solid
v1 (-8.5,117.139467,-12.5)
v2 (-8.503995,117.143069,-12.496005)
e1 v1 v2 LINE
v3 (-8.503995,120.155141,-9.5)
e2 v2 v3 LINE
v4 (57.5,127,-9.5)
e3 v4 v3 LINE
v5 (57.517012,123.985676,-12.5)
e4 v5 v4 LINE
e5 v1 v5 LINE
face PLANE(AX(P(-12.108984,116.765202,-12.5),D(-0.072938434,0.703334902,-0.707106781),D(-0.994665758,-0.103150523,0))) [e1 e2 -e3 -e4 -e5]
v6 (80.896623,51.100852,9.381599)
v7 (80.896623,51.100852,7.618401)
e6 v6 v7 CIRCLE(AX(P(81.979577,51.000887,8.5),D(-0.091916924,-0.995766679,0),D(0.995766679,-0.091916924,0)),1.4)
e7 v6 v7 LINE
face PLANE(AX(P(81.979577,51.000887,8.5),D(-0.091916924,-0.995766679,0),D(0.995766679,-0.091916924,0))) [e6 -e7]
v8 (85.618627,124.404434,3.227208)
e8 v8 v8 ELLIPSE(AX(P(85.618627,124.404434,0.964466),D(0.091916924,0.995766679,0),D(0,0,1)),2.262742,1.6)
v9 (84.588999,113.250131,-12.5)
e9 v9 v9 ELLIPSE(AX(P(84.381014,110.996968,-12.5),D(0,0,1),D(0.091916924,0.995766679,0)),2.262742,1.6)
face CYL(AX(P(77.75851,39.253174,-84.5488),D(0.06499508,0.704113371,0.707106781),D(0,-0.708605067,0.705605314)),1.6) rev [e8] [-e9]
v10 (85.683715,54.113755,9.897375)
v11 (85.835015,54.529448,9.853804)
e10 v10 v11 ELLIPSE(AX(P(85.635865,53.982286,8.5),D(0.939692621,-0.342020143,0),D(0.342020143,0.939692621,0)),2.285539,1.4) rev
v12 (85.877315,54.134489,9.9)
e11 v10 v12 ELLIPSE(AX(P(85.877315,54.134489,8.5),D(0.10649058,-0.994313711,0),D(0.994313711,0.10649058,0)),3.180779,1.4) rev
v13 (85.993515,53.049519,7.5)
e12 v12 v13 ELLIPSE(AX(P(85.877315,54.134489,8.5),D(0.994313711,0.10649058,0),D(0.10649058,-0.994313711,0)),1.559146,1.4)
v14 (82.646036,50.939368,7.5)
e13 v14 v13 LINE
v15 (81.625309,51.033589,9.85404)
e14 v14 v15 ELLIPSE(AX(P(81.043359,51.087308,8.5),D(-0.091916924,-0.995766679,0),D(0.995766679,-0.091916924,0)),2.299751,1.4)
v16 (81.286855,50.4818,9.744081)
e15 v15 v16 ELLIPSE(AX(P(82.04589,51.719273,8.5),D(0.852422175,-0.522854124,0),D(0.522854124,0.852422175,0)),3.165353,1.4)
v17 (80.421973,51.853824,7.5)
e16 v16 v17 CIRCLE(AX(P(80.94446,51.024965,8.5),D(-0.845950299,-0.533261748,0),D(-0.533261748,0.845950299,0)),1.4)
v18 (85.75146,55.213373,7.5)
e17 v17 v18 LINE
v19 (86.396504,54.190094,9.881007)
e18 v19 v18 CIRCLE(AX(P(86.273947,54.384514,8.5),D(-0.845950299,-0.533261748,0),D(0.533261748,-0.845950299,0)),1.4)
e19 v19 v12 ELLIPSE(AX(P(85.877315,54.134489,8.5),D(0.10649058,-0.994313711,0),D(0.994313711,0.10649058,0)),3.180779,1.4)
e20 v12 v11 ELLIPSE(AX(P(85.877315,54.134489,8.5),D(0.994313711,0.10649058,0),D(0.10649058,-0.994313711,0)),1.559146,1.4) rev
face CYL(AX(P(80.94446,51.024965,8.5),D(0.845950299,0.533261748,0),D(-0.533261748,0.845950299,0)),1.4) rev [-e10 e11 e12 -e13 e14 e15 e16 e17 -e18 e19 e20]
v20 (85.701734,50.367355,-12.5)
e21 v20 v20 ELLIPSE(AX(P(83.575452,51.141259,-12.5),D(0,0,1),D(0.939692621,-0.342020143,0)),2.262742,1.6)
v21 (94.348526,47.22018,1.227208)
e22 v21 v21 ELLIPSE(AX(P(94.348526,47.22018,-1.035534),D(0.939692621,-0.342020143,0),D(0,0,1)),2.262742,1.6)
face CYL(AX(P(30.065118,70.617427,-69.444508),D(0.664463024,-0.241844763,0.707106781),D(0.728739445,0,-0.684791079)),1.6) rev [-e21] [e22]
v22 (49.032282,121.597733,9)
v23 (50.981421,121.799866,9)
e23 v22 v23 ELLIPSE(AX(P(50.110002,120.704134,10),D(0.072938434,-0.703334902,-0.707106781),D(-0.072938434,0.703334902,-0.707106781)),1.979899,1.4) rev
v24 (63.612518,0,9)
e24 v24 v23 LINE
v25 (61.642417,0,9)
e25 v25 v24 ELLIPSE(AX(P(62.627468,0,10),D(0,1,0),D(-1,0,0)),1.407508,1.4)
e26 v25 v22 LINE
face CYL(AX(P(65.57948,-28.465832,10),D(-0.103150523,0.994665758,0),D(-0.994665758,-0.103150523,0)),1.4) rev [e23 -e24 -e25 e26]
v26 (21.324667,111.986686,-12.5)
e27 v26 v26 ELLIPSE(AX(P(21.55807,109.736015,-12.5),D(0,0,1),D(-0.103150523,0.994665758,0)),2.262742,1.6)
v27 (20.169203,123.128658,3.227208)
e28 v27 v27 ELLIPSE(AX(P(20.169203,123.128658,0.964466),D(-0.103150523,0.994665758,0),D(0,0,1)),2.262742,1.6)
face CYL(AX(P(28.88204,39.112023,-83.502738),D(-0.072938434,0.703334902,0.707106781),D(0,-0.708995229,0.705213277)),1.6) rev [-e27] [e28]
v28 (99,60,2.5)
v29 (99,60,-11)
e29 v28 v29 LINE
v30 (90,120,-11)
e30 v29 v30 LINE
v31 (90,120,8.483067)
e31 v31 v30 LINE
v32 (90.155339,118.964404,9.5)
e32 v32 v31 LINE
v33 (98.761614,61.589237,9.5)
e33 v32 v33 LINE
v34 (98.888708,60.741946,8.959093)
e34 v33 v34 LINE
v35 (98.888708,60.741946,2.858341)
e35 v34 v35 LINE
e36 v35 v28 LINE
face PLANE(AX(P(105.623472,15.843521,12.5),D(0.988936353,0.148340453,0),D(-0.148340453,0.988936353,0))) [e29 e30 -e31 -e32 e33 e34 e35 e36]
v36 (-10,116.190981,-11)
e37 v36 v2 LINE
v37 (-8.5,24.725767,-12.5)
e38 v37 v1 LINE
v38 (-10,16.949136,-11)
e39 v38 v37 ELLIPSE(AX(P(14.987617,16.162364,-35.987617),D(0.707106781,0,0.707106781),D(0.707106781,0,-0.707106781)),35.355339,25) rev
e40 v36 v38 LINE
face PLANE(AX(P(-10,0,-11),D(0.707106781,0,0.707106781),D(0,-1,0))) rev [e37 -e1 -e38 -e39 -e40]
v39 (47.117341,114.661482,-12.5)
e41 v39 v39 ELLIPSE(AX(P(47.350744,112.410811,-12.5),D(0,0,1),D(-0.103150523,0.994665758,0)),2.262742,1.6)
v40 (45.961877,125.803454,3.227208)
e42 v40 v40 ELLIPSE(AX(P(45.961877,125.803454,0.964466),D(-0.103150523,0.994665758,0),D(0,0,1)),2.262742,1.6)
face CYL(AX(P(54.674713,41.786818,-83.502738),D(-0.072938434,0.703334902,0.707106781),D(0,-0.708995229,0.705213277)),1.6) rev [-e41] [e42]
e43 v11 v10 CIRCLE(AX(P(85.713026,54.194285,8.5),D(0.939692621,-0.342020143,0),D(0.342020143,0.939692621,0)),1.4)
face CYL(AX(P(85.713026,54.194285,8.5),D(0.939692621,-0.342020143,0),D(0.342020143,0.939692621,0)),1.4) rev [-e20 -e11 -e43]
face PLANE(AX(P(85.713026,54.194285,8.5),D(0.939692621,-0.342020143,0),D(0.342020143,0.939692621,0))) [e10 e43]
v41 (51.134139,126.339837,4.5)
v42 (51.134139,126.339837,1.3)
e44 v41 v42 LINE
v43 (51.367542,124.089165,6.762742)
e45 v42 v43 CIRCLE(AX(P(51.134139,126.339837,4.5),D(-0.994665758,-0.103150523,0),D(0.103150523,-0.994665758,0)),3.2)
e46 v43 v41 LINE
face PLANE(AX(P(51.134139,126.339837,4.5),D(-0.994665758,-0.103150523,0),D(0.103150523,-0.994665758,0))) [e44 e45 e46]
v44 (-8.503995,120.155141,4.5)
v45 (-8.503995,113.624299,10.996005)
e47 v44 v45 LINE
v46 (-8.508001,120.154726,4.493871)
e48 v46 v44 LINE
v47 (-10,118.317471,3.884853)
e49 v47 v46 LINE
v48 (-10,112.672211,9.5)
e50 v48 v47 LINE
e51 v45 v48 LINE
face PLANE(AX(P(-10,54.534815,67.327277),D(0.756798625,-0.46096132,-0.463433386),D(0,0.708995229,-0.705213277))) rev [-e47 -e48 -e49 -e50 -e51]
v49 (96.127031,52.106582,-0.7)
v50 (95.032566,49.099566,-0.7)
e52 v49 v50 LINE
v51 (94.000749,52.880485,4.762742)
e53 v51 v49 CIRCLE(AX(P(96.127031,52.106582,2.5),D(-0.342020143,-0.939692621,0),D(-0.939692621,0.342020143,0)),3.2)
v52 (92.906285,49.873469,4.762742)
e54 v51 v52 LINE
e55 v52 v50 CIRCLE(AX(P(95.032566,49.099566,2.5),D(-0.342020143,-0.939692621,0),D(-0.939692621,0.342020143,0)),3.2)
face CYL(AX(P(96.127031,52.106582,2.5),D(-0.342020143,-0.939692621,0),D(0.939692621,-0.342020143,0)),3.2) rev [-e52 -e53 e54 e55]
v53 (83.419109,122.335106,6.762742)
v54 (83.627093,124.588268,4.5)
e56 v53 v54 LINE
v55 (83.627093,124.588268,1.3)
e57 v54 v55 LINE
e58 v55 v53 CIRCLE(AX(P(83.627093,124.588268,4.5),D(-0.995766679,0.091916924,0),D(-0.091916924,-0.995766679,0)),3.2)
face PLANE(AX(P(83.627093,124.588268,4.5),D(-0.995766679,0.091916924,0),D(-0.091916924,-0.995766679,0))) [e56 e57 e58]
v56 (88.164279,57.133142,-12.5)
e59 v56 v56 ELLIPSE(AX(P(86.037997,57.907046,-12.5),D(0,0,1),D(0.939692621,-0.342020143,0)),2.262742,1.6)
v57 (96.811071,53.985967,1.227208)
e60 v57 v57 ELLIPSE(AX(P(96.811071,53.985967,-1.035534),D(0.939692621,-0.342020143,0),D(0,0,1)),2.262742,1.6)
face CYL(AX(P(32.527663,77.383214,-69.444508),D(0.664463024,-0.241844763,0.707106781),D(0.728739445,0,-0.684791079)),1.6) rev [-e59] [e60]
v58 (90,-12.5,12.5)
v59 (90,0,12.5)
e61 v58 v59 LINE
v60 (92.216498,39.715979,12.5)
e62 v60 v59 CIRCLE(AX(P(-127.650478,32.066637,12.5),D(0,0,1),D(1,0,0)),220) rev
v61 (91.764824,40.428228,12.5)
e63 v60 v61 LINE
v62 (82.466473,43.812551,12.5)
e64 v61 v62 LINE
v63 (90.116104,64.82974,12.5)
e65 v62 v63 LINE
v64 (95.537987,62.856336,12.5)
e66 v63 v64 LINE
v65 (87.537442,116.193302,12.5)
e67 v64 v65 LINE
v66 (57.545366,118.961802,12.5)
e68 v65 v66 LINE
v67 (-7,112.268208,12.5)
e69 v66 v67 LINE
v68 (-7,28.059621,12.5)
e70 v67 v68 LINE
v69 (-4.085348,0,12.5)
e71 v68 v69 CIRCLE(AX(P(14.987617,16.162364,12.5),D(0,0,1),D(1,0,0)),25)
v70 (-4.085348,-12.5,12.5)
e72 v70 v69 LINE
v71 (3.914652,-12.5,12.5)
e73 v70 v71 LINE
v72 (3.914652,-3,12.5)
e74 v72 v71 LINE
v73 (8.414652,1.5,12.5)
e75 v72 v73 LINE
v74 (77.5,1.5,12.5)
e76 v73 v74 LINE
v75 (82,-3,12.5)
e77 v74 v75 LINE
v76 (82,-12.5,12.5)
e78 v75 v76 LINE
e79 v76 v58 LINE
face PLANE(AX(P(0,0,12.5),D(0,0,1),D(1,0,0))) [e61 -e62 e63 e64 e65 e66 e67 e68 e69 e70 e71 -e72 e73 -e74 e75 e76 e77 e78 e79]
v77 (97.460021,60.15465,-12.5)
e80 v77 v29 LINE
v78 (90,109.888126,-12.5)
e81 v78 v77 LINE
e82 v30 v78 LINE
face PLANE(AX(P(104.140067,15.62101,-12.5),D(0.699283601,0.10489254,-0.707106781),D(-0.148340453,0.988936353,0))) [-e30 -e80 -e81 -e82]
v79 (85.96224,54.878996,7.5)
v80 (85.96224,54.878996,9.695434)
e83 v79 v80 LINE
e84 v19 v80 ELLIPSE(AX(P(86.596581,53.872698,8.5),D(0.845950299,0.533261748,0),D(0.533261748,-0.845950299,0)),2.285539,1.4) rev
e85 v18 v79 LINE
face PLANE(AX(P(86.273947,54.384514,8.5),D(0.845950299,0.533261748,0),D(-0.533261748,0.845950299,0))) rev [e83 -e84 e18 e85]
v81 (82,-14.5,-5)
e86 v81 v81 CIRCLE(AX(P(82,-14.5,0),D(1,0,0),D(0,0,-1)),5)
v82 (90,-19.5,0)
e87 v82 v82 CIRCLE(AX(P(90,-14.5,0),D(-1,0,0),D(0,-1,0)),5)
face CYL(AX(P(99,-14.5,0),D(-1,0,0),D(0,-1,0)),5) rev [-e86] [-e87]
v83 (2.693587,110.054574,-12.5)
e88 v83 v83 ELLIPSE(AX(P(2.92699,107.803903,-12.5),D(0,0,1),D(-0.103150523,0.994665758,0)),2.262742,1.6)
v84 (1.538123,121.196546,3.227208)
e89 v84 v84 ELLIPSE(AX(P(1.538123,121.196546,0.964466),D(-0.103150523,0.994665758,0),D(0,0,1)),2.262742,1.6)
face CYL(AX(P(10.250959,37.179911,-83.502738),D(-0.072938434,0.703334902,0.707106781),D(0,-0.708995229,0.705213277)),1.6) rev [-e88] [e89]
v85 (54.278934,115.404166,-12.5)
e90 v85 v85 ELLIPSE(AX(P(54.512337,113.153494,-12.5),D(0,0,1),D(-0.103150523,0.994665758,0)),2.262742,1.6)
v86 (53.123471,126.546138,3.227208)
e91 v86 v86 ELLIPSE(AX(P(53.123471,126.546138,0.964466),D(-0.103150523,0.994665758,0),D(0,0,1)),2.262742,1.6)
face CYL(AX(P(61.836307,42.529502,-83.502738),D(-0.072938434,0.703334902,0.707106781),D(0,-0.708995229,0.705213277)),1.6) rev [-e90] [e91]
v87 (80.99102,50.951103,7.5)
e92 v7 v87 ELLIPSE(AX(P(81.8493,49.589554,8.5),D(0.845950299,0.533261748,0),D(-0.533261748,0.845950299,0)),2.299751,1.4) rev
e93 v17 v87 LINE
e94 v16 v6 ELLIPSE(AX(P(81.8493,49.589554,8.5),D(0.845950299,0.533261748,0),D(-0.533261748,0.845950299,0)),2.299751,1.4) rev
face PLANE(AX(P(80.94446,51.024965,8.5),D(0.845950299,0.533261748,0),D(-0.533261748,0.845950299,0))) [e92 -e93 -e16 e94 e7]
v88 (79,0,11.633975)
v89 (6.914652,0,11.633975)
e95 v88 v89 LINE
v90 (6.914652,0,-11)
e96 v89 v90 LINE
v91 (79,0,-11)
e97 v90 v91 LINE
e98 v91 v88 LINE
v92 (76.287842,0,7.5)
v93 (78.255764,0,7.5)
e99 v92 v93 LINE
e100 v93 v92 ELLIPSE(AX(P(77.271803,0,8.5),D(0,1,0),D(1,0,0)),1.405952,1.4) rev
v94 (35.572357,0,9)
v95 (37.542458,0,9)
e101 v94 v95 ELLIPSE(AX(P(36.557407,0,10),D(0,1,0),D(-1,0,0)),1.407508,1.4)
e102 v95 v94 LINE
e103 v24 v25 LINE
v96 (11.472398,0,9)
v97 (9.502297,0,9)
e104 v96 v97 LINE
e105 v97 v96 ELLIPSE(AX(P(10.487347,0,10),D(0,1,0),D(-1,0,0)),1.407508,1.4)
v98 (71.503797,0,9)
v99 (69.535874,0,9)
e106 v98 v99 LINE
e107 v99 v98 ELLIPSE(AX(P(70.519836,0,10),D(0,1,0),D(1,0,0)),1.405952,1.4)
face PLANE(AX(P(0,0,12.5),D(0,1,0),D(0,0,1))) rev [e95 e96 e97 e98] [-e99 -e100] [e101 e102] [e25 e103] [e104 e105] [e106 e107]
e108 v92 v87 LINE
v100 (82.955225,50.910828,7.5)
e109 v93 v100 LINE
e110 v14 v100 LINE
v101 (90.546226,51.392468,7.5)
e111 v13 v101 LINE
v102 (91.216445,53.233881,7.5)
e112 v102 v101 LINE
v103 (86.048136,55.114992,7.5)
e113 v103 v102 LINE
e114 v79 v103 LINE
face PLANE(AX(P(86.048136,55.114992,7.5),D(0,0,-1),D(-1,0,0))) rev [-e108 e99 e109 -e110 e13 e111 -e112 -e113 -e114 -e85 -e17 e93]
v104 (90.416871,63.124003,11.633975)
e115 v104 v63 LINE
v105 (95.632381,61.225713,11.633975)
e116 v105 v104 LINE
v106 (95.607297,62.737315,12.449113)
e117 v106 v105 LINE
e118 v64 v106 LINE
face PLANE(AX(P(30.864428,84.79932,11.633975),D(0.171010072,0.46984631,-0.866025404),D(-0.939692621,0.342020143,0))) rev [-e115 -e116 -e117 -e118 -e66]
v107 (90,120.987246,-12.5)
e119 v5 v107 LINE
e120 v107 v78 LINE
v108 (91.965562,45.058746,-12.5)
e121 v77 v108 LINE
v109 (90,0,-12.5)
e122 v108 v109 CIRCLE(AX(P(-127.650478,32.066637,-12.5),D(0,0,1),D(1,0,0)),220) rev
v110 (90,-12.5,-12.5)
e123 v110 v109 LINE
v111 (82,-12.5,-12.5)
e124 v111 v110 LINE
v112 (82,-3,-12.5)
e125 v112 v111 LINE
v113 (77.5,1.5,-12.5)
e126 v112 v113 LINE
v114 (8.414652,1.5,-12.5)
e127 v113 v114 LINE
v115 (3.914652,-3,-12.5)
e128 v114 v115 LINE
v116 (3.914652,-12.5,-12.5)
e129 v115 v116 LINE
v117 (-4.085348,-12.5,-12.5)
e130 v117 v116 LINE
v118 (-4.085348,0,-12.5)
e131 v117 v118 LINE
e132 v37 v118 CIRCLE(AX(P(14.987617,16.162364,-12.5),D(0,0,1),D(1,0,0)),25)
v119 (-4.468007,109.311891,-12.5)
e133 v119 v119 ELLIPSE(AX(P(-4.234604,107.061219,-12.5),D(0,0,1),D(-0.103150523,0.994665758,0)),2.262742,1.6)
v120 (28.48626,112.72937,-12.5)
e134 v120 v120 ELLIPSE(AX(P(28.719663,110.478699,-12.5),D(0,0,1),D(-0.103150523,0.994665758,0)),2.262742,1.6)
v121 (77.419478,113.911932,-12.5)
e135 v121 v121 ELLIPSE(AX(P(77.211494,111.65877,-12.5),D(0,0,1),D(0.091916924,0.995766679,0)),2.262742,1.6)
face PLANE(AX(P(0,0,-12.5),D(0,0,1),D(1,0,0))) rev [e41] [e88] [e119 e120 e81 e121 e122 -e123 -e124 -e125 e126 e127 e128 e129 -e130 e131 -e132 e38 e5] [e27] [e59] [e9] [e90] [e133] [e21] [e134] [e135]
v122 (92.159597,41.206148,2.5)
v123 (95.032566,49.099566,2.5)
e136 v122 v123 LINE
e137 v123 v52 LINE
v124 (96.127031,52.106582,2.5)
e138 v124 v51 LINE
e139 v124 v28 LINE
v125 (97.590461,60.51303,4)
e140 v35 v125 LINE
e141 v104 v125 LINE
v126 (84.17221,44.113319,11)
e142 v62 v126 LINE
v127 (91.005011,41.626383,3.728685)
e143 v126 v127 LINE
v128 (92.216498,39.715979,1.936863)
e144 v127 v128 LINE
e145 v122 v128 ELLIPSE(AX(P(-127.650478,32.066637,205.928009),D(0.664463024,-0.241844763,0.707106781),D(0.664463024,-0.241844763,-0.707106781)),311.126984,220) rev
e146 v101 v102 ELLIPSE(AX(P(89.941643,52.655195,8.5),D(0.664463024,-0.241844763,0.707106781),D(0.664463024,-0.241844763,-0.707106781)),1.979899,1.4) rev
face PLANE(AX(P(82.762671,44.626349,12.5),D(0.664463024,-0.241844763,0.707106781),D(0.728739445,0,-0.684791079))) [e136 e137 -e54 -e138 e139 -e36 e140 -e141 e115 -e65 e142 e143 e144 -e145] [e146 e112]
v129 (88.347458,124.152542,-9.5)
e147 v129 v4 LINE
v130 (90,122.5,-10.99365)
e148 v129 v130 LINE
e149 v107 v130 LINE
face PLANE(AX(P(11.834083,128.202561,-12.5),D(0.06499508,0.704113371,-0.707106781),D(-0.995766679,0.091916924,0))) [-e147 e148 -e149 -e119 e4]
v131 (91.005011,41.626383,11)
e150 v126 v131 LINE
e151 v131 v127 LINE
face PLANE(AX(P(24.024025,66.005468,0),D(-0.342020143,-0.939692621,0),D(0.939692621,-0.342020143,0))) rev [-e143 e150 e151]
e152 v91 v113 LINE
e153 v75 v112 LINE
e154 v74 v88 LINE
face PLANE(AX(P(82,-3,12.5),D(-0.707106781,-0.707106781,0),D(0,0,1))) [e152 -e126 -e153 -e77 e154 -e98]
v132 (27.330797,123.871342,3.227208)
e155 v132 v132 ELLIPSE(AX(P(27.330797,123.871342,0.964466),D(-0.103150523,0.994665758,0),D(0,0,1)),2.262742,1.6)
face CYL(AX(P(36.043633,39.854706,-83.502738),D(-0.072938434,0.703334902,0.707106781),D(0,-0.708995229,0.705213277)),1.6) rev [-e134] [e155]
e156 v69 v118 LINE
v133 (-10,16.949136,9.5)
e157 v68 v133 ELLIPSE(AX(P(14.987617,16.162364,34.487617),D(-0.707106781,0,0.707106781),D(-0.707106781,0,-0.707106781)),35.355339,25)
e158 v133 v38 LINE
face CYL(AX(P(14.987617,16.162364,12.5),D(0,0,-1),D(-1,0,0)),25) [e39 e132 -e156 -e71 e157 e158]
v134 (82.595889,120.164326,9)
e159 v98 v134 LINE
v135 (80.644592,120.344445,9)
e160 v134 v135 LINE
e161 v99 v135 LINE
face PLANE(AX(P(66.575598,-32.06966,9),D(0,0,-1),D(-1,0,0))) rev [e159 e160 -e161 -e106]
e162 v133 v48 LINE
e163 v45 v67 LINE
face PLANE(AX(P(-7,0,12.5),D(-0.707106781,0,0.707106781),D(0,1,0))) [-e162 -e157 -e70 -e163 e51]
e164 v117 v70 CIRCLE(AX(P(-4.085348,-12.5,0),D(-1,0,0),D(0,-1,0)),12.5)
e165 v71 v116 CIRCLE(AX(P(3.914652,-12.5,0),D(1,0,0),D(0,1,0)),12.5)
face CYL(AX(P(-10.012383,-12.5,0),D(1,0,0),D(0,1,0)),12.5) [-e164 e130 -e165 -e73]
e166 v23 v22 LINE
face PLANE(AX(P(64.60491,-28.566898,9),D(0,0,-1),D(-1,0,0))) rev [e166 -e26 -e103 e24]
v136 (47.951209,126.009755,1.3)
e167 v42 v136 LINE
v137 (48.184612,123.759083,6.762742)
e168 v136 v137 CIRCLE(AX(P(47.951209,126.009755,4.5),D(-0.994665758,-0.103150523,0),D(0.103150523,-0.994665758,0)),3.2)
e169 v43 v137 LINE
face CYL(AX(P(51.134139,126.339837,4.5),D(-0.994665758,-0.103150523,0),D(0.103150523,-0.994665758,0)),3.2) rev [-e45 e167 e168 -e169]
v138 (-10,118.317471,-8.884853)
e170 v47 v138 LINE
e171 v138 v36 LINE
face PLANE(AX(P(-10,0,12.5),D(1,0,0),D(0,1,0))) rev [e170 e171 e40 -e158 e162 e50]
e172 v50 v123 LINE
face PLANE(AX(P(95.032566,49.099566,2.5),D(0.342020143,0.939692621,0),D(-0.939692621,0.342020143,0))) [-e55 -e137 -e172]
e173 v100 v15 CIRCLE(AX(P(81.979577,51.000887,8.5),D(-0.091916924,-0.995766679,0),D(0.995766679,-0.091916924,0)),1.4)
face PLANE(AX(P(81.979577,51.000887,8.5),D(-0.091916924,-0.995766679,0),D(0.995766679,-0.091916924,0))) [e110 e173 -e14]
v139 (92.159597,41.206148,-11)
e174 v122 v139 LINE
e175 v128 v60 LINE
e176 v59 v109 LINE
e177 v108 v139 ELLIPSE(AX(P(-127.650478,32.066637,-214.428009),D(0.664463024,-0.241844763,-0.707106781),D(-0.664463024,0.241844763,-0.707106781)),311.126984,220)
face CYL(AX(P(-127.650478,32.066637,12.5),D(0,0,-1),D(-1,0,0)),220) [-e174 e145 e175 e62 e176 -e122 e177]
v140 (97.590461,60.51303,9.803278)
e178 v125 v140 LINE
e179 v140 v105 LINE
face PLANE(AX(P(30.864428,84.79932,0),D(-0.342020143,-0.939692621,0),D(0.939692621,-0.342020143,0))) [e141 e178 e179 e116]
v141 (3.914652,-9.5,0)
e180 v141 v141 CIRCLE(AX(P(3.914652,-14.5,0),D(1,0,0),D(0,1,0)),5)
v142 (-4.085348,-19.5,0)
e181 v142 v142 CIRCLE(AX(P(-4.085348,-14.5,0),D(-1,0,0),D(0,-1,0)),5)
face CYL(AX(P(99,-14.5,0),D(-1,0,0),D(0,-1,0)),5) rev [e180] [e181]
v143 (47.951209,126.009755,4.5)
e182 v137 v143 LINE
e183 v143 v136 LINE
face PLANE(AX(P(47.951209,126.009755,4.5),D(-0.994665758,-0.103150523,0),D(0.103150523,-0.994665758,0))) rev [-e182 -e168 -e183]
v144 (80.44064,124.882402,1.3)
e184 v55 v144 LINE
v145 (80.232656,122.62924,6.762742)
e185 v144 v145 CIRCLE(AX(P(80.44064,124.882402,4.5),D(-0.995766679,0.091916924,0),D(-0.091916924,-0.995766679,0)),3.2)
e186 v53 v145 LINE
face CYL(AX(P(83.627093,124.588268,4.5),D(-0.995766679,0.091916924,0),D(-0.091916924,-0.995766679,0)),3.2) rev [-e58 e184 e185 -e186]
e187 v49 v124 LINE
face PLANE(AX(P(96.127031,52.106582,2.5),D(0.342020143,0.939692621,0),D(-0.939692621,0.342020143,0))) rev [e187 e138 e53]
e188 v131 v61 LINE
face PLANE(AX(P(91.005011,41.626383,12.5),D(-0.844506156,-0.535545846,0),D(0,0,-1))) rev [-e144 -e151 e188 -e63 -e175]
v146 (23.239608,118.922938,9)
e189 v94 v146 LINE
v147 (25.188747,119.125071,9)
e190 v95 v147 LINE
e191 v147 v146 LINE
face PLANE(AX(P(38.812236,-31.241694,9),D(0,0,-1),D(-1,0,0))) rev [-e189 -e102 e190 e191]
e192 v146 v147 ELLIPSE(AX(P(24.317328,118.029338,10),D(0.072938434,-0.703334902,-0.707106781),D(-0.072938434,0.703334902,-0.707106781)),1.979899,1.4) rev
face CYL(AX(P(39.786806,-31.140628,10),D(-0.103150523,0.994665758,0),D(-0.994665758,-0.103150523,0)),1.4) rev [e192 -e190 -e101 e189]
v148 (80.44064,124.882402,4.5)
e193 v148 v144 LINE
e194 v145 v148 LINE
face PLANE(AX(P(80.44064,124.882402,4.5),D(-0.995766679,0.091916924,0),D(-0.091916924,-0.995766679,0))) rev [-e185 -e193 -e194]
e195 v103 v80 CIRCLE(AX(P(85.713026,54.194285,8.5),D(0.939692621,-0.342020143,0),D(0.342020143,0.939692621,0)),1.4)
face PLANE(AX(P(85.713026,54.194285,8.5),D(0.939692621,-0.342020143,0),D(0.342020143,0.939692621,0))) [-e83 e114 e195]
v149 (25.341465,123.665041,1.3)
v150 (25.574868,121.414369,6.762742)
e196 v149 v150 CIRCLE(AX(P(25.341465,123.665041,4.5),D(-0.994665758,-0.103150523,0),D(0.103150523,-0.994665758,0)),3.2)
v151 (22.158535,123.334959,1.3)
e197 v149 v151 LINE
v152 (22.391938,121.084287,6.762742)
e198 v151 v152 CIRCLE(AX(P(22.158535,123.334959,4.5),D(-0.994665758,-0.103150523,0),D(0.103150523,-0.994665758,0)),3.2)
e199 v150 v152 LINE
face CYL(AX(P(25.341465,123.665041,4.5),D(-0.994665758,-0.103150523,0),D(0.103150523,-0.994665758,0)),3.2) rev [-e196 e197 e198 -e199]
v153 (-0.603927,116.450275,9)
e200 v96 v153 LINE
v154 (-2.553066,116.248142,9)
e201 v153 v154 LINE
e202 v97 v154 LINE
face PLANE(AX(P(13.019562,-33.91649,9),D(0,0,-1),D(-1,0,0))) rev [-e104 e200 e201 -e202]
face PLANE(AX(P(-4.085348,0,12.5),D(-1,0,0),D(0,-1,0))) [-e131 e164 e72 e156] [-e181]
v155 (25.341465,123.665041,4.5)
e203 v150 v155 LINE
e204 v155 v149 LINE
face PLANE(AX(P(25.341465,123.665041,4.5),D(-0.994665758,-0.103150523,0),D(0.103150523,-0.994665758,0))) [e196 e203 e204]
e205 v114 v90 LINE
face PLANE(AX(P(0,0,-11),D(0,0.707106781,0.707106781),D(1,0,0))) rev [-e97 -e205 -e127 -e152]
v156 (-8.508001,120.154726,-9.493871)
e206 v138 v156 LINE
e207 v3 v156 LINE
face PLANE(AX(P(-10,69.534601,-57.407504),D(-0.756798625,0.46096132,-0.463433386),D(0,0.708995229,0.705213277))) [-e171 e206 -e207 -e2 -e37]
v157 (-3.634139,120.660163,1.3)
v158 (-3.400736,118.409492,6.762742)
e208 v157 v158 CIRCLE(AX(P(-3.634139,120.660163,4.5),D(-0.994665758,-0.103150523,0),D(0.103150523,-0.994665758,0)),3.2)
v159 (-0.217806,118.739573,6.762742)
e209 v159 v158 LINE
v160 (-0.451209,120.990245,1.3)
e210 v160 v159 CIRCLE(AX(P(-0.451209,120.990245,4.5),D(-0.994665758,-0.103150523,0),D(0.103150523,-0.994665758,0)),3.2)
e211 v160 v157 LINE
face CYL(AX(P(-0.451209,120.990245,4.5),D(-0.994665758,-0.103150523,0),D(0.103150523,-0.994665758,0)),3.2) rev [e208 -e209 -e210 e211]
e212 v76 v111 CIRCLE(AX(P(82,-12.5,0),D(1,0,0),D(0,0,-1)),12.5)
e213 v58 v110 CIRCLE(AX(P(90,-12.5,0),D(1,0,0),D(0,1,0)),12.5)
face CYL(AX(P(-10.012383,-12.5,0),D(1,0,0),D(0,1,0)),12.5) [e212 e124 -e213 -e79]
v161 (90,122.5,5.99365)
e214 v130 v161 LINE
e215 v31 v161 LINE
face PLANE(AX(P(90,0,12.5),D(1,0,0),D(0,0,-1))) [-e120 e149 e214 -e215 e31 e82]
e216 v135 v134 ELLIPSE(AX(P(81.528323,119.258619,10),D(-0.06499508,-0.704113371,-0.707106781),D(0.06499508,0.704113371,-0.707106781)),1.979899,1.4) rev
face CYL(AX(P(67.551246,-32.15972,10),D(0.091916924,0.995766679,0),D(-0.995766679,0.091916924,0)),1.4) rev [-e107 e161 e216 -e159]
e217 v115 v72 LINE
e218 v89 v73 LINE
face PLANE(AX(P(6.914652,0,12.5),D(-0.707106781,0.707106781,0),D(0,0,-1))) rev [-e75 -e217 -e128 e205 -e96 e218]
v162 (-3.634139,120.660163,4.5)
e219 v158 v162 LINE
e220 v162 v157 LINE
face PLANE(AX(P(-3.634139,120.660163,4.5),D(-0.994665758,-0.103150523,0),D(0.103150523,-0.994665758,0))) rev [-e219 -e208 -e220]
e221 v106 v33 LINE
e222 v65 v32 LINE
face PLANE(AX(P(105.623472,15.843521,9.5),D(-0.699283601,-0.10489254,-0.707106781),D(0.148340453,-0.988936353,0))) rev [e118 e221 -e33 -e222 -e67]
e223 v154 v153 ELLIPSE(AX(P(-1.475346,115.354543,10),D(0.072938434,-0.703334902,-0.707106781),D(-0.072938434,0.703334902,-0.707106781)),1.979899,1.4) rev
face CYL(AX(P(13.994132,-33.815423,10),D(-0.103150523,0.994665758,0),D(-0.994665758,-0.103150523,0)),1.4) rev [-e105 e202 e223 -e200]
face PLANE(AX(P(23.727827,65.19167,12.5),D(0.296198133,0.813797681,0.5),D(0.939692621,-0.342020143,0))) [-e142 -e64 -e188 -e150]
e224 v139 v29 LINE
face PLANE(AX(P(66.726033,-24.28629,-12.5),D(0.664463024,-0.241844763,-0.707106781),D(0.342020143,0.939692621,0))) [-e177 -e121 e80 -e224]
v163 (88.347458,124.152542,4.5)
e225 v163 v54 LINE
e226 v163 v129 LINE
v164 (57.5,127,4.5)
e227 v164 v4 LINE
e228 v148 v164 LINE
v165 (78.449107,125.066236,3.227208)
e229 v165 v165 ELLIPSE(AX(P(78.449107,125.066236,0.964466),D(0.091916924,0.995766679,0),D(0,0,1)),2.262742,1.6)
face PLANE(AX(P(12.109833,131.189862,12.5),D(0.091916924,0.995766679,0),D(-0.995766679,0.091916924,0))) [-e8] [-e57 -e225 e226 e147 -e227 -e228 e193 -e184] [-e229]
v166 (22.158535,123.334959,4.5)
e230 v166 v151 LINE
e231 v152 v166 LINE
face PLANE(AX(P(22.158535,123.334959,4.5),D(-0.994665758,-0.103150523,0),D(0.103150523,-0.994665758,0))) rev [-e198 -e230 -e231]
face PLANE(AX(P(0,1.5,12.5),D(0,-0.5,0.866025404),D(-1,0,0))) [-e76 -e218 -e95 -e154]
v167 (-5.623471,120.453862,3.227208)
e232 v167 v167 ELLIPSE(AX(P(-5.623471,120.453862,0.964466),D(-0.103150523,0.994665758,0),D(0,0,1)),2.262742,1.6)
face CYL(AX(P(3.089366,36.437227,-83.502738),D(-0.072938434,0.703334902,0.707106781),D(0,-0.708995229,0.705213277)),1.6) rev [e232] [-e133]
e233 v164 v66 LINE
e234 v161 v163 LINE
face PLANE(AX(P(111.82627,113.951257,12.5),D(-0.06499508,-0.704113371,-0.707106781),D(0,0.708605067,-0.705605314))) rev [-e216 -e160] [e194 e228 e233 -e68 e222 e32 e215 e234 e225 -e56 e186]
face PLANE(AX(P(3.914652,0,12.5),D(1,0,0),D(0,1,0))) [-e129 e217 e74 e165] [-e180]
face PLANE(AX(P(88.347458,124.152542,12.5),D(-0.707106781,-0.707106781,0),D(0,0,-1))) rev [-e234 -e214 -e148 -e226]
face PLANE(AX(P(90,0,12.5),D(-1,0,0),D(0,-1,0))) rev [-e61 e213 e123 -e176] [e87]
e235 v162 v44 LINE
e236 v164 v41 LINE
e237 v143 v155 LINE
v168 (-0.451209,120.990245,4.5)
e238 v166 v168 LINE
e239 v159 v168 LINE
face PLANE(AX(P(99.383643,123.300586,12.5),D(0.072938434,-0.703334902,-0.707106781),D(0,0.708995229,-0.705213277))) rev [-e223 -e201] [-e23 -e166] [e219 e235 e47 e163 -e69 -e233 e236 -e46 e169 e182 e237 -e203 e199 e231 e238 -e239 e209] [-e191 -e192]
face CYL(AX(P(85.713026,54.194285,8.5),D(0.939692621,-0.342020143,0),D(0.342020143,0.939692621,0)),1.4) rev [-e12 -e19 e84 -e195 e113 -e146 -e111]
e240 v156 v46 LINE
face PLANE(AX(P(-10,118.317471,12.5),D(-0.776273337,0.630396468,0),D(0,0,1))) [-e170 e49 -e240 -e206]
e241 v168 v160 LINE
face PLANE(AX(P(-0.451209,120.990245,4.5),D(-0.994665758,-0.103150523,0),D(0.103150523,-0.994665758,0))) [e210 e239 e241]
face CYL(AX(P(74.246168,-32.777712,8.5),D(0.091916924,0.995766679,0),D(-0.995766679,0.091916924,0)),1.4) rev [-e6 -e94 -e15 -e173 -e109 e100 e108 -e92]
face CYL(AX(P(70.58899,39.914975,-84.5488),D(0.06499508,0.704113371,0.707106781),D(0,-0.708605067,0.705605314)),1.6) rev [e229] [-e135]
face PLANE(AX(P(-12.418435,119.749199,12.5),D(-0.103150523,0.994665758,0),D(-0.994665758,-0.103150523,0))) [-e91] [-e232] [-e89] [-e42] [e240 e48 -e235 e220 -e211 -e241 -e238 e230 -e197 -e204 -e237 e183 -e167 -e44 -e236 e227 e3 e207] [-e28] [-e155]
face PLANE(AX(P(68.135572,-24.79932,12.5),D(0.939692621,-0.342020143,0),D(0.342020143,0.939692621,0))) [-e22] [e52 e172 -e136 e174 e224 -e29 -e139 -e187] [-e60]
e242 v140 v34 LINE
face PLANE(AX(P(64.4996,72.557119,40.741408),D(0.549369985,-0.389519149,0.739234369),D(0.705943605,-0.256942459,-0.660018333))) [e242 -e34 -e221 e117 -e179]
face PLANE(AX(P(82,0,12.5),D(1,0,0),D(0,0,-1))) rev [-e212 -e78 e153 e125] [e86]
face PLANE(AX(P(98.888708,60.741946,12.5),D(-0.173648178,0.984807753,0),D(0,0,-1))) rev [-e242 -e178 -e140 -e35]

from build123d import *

# Parameters (mm, degrees)
SKETCH2_W                = 90
SKETCH2_H                = 120
BOSS_EXTRUDE1_DEPTH      = 12.5
SKETCH5_R                = 1.6
CUT_EXTRUDE1_DEPTH       = 156.95939029
SKETCH6_R                = 1.6
CUT_EXTRUDE2_DEPTH       = 155.009726207
SKETCH8_R                = 1.6
CUT_EXTRUDE3_DEPTH       = 162.607831264
CUT_EXTRUDE4_DEPTH       = 184.091912597
CUT_EXTRUDE5_DEPTH       = 180.168702353
CUT_EXTRUDE6_DEPTH       = 10.5
CUT_EXTRUDE7_DEPTH       = 6.3
CUT_EXTRUDE8_DEPTH       = 121.021740428
CUT_EXTRUDE9_DEPTH       = 157.064702034
CUT_EXTRUDE9_DEPTH_BACK  = 157.064702034
CUT_EXTRUDE10_DEPTH      = 155.490641088
CUT_EXTRUDE10_DEPTH_BACK = 155.490641088
CUT_EXTRUDE11_DEPTH      = 10
CUT_EXTRUDE11_DEPTH_BACK = 10
CUT_EXTRUDE12_DEPTH      = 163.134903098
CUT_EXTRUDE13_DEPTH      = 1.6
LPATTERN1_COUNT          = 3
LPATTERN1_PITCH          = 25.93099615
CUT_EXTRUDE14_DEPTH      = 1.6
CUT_EXTRUDE15_DEPTH      = 1.6
SKETCH27_R               = 5
CUT_EXTRUDE16_DEPTH      = 165.048282365
CHAMFER1_SIZE            = 3
CHAMFER2_SIZE            = 1.5
CHAMFER2_SIZE_2          = 1.659567856
CHAMFER2_SIZE_3          = 1.682528735
CHAMFER2_SIZE_4          = 1.622677659
CHAMFER3_SIZE            = 1.5
CHAMFER3_SIZE2           = 0.866025404
CHAMFER4_SIZE            = 1.228684906
CHAMFER4_SIZE_2          = 1.5
CHAMFER4_SIZE_3          = 0.866025404
CHAMFER4_SIZE_4          = 0.750246653
CHAMFER4_SIZE_5          = 0.762190103


with BuildPart() as part:
    # Sketch2 → Boss-Extrude1 (new, symmetric)
    with BuildSketch(Plane.XY):
        with Locations((45, 60)):
            Rectangle(SKETCH2_W, SKETCH2_H)
        with BuildLine():
            Line((-10, 120), (-10, 16.949135542))
            ThreePointArc((-10, 16.949135542), (-8.616450838, 7.92537499), (-4.085347876, 0))
            Line((-4.085347876, 0), (0, 0))
            Line((0, 0), (0, 120))
            Line((0, 120), (-10, 120))
        make_face()
        with BuildLine():
            ThreePointArc((92.159597133, 41.206147584), (92.047998407, 20.552330839), (90, 0))
            Line((90, 0), (90, 120))
            Line((90, 120), (99, 60))
            Line((99, 60), (92.159597133, 41.206147584))
        make_face()
        Polygon((90, 124), (90, 120), (0, 120), (-10, 120), (57.5, 127), align=None)
        Polygon((90, 0), (82, 0), (82, -25), (90, -25), (90, -2), align=None)
        Polygon((3.914652124, 0), (0, 0), (-4.085347876, 0), (-4.085347876, -2), (-4.085347876, -25), (3.914652124, -25), align=None)
    extrude(amount=BOSS_EXTRUDE1_DEPTH, both=True)

    # Sketch5 → Cut-Extrude1 (cut, through all)
    with BuildSketch(Plane(origin=(-6.441306417, 62.112597597, 62.445698079), x_dir=(0.9946657577296572, 0.10315052302381683, 0), z_dir=(-0.07293843431307986, 0.703334902304695, 0.7071067811865488))):
        with Locations(Location((6.831405186, 84.447592104, 0), (0, 0, 270))):
            Circle(SKETCH5_R)
        with Locations(Location((14.031405186, 84.447592104, 0), (0, 0, 270))):
            Circle(SKETCH5_R)
        with Locations(Location((32.76240134, 84.447592104, 0), (0, 0, 270))):
            Circle(SKETCH5_R)
        with Locations(Location((39.96240134, 84.447592104, 0), (0, 0, 270))):
            Circle(SKETCH5_R)
        with Locations(Location((58.693397493, 84.447592104, 0), (0, 0, 270))):
            Circle(SKETCH5_R)
        with Locations(Location((65.893397493, 84.447592104, 0), (0, 0, 270))):
            Circle(SKETCH5_R)
    extrude(amount=-CUT_EXTRUDE1_DEPTH, mode=Mode.SUBTRACT)

    # Sketch6 → Cut-Extrude2 (cut, through all)
    with BuildSketch(Plane(origin=(6.261729766, 67.835405795, 68.123795689), x_dir=(0.9957666790179708, -0.09191692421704345, 0), z_dir=(0.0649950804196813, 0.7041133712132142, 0.7071067811865487))):
        with Locations(Location((66.621302509, 92.477634753, 0), (0, 0, 270))):
            Circle(SKETCH6_R)
        with Locations(Location((73.821302509, 92.477634753, 0), (0, 0, 270))):
            Circle(SKETCH6_R)
    extrude(amount=-CUT_EXTRUDE2_DEPTH, mode=Mode.SUBTRACT)

    # Sketch8 → Cut-Extrude3 (cut, through all)
    with BuildSketch(Plane(origin=(35.242401598, -12.827185166, 37.504180429), x_dir=(-0.34202014332566816, -0.9396926207859086, 0), z_dir=(0.6644630243886737, -0.24184476264797442, 0.7071067811865488))):
        with Locations(Location((-83.841551436, 52.003386703, 0), (0, 0, 90))):
            Circle(SKETCH8_R)
        with Locations(Location((-76.641551436, 52.003386703, 0), (0, 0, 90))):
            Circle(SKETCH8_R)
    extrude(amount=-CUT_EXTRUDE3_DEPTH, mode=Mode.SUBTRACT)

    # Sketch9 → Cut-Extrude4 (cut, through all)
    with BuildSketch(Plane(origin=(-12.418435481, 119.749199283, 0), x_dir=(0.9946657577296573, 0.10315052302381666, 0), z_dir=(-0.10315052302381666, 0.9946657577296573, 0))):
        with BuildLine():
            Line((9.451609288, -9), (11.411201083, -9))
            ThreePointArc((11.411201083, -9), (11.831372787, -9.990475603), (11.424716354, -10.986576364))
            ThreePointArc((11.424716354, -10.986576364), (10.431405186, -11.4), (9.438094017, -10.986576364))
            ThreePointArc((9.438094017, -10.986576364), (9.031437584, -9.990475603), (9.451609288, -9))
        make_face()
        with BuildLine():
            Line((35.382605442, -9), (37.342197237, -9))
            ThreePointArc((37.342197237, -9), (37.762383115, -9.992856678), (37.352350833, -10.989949494))
            ThreePointArc((37.352350833, -10.989949494), (36.369544662, -11.399981776), (35.382605442, -11))
            ThreePointArc((35.382605442, -11), (34.96240134, -10), (35.382605442, -9))
        make_face()
        with BuildLine():
            Line((61.313601596, -9), (63.273193391, -9))
            ThreePointArc((63.273193391, -9), (63.693397493, -10), (63.273193391, -11))
            ThreePointArc((63.273193391, -11), (62.293397493, -11.4), (61.313601596, -11))
            ThreePointArc((61.313601596, -11), (60.893397493, -10), (61.313601596, -9))
        make_face()
    extrude(amount=-CUT_EXTRUDE4_DEPTH, mode=Mode.SUBTRACT)

    # Sketch10 → Cut-Extrude5 (cut, through all)
    with BuildSketch(Plane(origin=(12.109833372, 131.189861535, 0), x_dir=(0.9957666790179708, -0.09191692421704356, 0), z_dir=(0.09191692421704355, 0.9957666790179707, 0))):
        with BuildLine():
            Line((69.241506612, -9), (71.201098406, -9))
            ThreePointArc((71.201098406, -9), (71.621300734, -9.997770738), (71.204278093, -10.996874616))
            ThreePointArc((71.204278093, -10.996874616), (70.221302509, -11.4), (69.238326924, -10.996874616))
            ThreePointArc((69.238326924, -10.996874616), (68.821304284, -9.997770738), (69.241506612, -9))
        make_face()
    extrude(amount=-CUT_EXTRUDE5_DEPTH, mode=Mode.SUBTRACT)

    # Sketch11 → Cut-Extrude6 (cut)
    with BuildSketch(Plane(origin=(68.135571644, -24.799319973, 0), x_dir=(0, 0, -1), z_dir=(0.9396926207859085, -0.34202014332566827, 0))):
        with BuildLine():
            Line((-7.5, 81.221347334), (-7.5, 79.261755539))
            ThreePointArc((-7.5, 79.261755539), (-8.5, 78.841551436), (-9.5, 79.261755539))
            ThreePointArc((-9.5, 79.261755539), (-9.9, 80.241551436), (-9.5, 81.221347334))
            ThreePointArc((-9.5, 81.221347334), (-8.5, 81.641551436), (-7.5, 81.221347334))
        make_face()
    extrude(amount=-CUT_EXTRUDE6_DEPTH, mode=Mode.SUBTRACT)

    # Sketch12 → Cut-Extrude7 (cut)
    with BuildSketch(Plane(origin=(86.596580977, 53.872697603, 0), x_dir=(0, 0, 1), z_dir=(-0.8459502990860707, -0.5332617476213607, 0))):
        with BuildLine():
            Line((7.5, 1.584815358), (7.5, -0.374776437))
            ThreePointArc((7.5, -0.374776437), (8.5, -0.79498054), (9.5, -0.374776437))
            ThreePointArc((9.5, -0.374776437), (9.9, 0.60501946), (9.5, 1.584815358))
            ThreePointArc((9.5, 1.584815358), (8.5, 2.00501946), (7.5, 1.584815358))
        make_face()
    extrude(amount=CUT_EXTRUDE7_DEPTH, mode=Mode.SUBTRACT)

    # Sketch13 → Cut-Extrude8 (cut, through all)
    with BuildSketch(Plane(origin=(82.033004534, 50.995955609, 0), x_dir=(-0.9957666790179708, 0.09191692421704294, 0), z_dir=(-0.09191692421704294, -0.9957666790179708, 0))):
        with BuildLine():
            Line((-0.926141451, -7.5), (1.033450343, -7.5))
            ThreePointArc((1.033450343, -7.5), (1.453654446, -8.5), (1.033450343, -9.5))
            ThreePointArc((1.033450343, -9.5), (0.053654446, -9.9), (-0.926141451, -9.5))
            ThreePointArc((-0.926141451, -9.5), (-1.346345554, -8.5), (-0.926141451, -7.5))
        make_face()
    extrude(amount=CUT_EXTRUDE8_DEPTH, mode=Mode.SUBTRACT)

    # Sketch15 → Cut-Extrude9 (cut, two sides: drawn at the far end of the back side and taken through both)
    with BuildSketch(Plane(origin=(69.924033195, -6.454526141, 0), x_dir=(-0.09191692421704244, -0.9957666790179709, 0), z_dir=(-0.9957666790179708, 0.09191692421704242, 0)).offset(-CUT_EXTRUDE9_DEPTH_BACK)):
        Polygon((-131.747591378, 12.5), (-123.747591378, 12.5), (-131.747591378, 4.5), align=None)
    extrude(amount=CUT_EXTRUDE9_DEPTH + CUT_EXTRUDE9_DEPTH_BACK, mode=Mode.SUBTRACT)

    # Sketch17 → Cut-Extrude10 (cut, two sides: drawn at the far end of the back side and taken through both)
    with BuildSketch(Plane(origin=(10.375761543, 1.076004901, 0), x_dir=(0.10315052302381672, -0.9946657577296572, 0), z_dir=(-0.9946657577296572, -0.10315052302381673, 0)).offset(-CUT_EXTRUDE10_DEPTH_BACK)):
        Polygon((-120.391396158, 12.5), (-112.391396158, 12.5), (-120.391396158, 4.5), align=None)
    extrude(amount=CUT_EXTRUDE10_DEPTH + CUT_EXTRUDE10_DEPTH_BACK, mode=Mode.SUBTRACT)

    # Sketch19 → Cut-Extrude11 (cut, two sides: drawn at the far end of the back side and taken through both)
    with BuildSketch(Plane(origin=(27.444226923, 75.402393765, 0), x_dir=(-0.9396926207859088, 0.34202014332566816, 0), z_dir=(-0.34202014332566816, -0.9396926207859088, 0)).offset(-CUT_EXTRUDE11_DEPTH_BACK)):
        Polygon((-72.508360858, -12.5), (-62.508360858, -12.5), (-72.508360858, -2.5), align=None)
    extrude(amount=CUT_EXTRUDE11_DEPTH + CUT_EXTRUDE11_DEPTH_BACK, mode=Mode.SUBTRACT)

    # Sketch20 → Cut-Extrude12 (cut, through all)
    with BuildSketch(Plane(origin=(90, 0, 0), x_dir=(0, 0, -1), z_dir=(1, 0, 0))):
        with BuildLine():
            ThreePointArc((2e-08, -25), (-8.838834758, -21.338834772), (-12.5, -12.5))
            Line((-12.5, -12.5), (-12.5, -25))
            Line((-12.5, -25), (2e-08, -25))
        make_face()
        with BuildLine():
            ThreePointArc((12.5, -12.5), (8.838834772, -21.338834758), (2e-08, -25))
            Line((2e-08, -25), (12.5, -25))
            Line((12.5, -25), (12.5, -12.5))
        make_face()
    extrude(amount=-CUT_EXTRUDE12_DEPTH, mode=Mode.SUBTRACT)

    # Sketch22 → Cut-Extrude13 (cut, symmetric)
    with BuildSketch(Plane(origin=(10.375761543, 1.076004901, 0), x_dir=(0.10315052302381672, -0.9946657577296572, 0), z_dir=(-0.9946657577296572, -0.10315052302381673, 0))):
        with BuildLine():
            Line((-118.128654458, 6.7627417), (-120.391396158, 4.5))
            Line((-120.391396158, 4.5), (-120.391396158, 1.3))
            ThreePointArc((-120.391396158, 1.3), (-117.434981654, 3.275413016), (-118.128654458, 6.7627417))
        make_face()
    cut_extrude13 = extrude(amount=CUT_EXTRUDE13_DEPTH, both=True, mode=Mode.SUBTRACT)

    # LPattern1: Cut-Extrude13 ×3
    with Locations(*[Vector(0.9946657577296572, 0.10315052302381714, 0) * (i * LPATTERN1_PITCH) for i in range(1, LPATTERN1_COUNT)]):
        add(cut_extrude13, mode=Mode.SUBTRACT)

    # Sketch25 → Cut-Extrude14 (cut, symmetric)
    with BuildSketch(Plane(origin=(69.924033195, -6.454526141, 0), x_dir=(-0.09191692421704244, -0.9957666790179709, 0), z_dir=(-0.9957666790179708, 0.09191692421704242, 0))):
        with BuildLine():
            Line((-129.484849678, 6.7627417), (-131.747591378, 4.5))
            Line((-131.747591378, 4.5), (-131.747591378, 1.3))
            ThreePointArc((-131.747591378, 1.3), (-128.791176874, 3.275413016), (-129.484849678, 6.7627417))
        make_face()
    extrude(amount=CUT_EXTRUDE14_DEPTH, both=True, mode=Mode.SUBTRACT)

    # Sketch26 → Cut-Extrude15 (cut, symmetric)
    with BuildSketch(Plane(origin=(27.444226923, 75.402393765, 0), x_dir=(-0.9396926207859088, 0.34202014332566816, 0), z_dir=(-0.34202014332566816, -0.9396926207859088, 0))):
        with BuildLine():
            Line((-72.508360858, 0.7), (-72.508360858, -2.5))
            Line((-72.508360858, -2.5), (-70.245619158, -4.7627417))
            ThreePointArc((-70.245619158, -4.7627417), (-69.551946354, -1.275413016), (-72.508360858, 0.7))
        make_face()
    extrude(amount=CUT_EXTRUDE15_DEPTH, both=True, mode=Mode.SUBTRACT)

    # Sketch27 → Cut-Extrude16 (cut, through all)
    with BuildSketch(Plane.ZY.offset(4.085347876)):
        with Locations(Location((0, -14.5, 0), (0, 0, 270))):
            Circle(SKETCH27_R)
    extrude(amount=-CUT_EXTRUDE16_DEPTH, mode=Mode.SUBTRACT)

    # Chamfer1
    # the kernel refuses this chamfer: 3 mm, written as the material it adds along each edge
    with BuildSketch(Plane(origin=(82, 0, 12.5), x_dir=(0, -1, 0), z_dir=(0, 0, -1)), Plane(origin=(3.914652124, 0, 12.5), x_dir=(1, 0, 0), z_dir=(0, 0, -1))) as chamfer1_piece_1:
        Polygon((CHAMFER1_SIZE, 0), (0, CHAMFER1_SIZE), (0, 0), align=None)
    extrude(amount=25)
    # the kernel refuses this chamfer: 3 mm, written as the material it takes off along each edge
    with BuildSketch(Plane(origin=(34.452833944, 129.127430713, -12.5), x_dir=(-0.09191692421704341, -0.9957666790179708, 0), z_dir=(0.9957666790179708, -0.09191692421704342, 0))) as chamfer1_2_piece_1:
        Polygon((CHAMFER1_SIZE, 0), (0, -CHAMFER1_SIZE), (0, 0), align=None)
    extrude(amount=63.498363696, mode=Mode.SUBTRACT)
    with BuildSketch(Plane(origin=(89.46914369, 123.539042065, 12.5), x_dir=(0, 0, -1), z_dir=(0.14834045293024442, -0.9889363528682976, 0))) as chamfer1_2_piece_2:
        Polygon((CHAMFER1_SIZE, 0), (0, -CHAMFER1_SIZE), (0, 0), align=None)
    extrude(amount=71.964929031, mode=Mode.SUBTRACT)
    with BuildSketch(Plane(origin=(-17.673895024, 119.204188664, -12.5), x_dir=(0.10315052302381651, -0.9946657577296572, 0), z_dir=(0.9946657577296573, 0.10315052302381653, 0))) as chamfer1_2_piece_3:
        Polygon((CHAMFER1_SIZE, 0), (0, -CHAMFER1_SIZE), (0, 0), align=None)
    extrude(amount=98.722188164, mode=Mode.SUBTRACT)
    with BuildSketch(Plane(origin=(-10, 119.672146172, 12.5), x_dir=(0, 0, -1), z_dir=(0, -1, 0))) as chamfer1_2_piece_4_section:
        Polygon((CHAMFER1_SIZE, 0), (0, CHAMFER1_SIZE), (0, 0), align=None)
    chamfer1_2_piece_4 = extrude(amount=115.838593868, mode=Mode.PRIVATE)
    chamfer1_2_piece_4 = chamfer1_2_piece_4 - Plane(origin=(14.987616754, 16.162364314, 12.5), x_dir=(-0.9995046701515525, 0.031470849134337946, 0), z_dir=(0, 0, 1)) * Cylinder(25, 244, mode=Mode.PRIVATE)
    add(chamfer1_2_piece_4, mode=Mode.SUBTRACT)

    # Chamfer2
    # the kernel refuses this chamfer: 1.682528735, 1.659567856, 1.622677659, 1.5 mm, written as the material it takes off along each edge
    with BuildSketch(Plane(origin=(89.427773071, 123.814846192, -12.5), x_dir=(-0.9889363528682975, -0.1483404529302444, 0), z_dir=(0.14834045293024442, -0.9889363528682976, 0))) as chamfer2_piece_1_section:
        Polygon((CHAMFER2_SIZE, 0), (0, -CHAMFER2_SIZE), (0, 0), align=None)
    chamfer2_piece_1 = extrude(amount=68.386294212, mode=Mode.PRIVATE)
    chamfer2_piece_1 = split(chamfer2_piece_1, bisect_by=Plane(origin=(90, 123.814846192, -12.5), z_dir=(1, 0, 0)), keep=Keep.TOP, mode=Mode.PRIVATE)
    add(chamfer2_piece_1, mode=Mode.SUBTRACT)
    with BuildSketch(Plane(origin=(100.319351076, 63.62488729, -12.5), x_dir=(-0.9396926207859085, 0.3420201433256683, 0), z_dir=(-0.34202014332566827, -0.9396926207859085, 0))) as chamfer2_piece_2_section:
        Polygon((CHAMFER2_SIZE, 0), (0, -CHAMFER2_SIZE), (0, 0), align=None)
    chamfer2_piece_2 = extrude(amount=27.715048964, mode=Mode.PRIVATE)
    chamfer2_piece_2 = chamfer2_piece_2 - Plane(origin=(-127.650478494, 32.066637048, -12.5), x_dir=(0.9991367073954792, 0.041543229712201084, 0), z_dir=(0, 0, 1)) * Cylinder(220, 62, mode=Mode.PRIVATE)
    add(chamfer2_piece_2, mode=Mode.SUBTRACT)
    with BuildSketch(Plane(origin=(82.857524482, 0, -12.5), x_dir=(0, 1, 0), z_dir=(-1, 0, 0))) as chamfer2_piece_3_section:
        Polygon((CHAMFER2_SIZE, 0), (0, -CHAMFER2_SIZE), (0, 0), align=None)
    chamfer2_piece_3 = extrude(amount=79.80039684, mode=Mode.PRIVATE)
    chamfer2_piece_3 = split(chamfer2_piece_3, bisect_by=Plane(origin=(80.928762241, -1.928762241, -12.5), z_dir=(-0.7071067811865476, -0.7071067811865476, 0)), keep=Keep.TOP, mode=Mode.PRIVATE)
    chamfer2_piece_3 = split(chamfer2_piece_3, bisect_by=Plane(origin=(44.886088303, 37.971436179, -12.5), z_dir=(0.7071067811865476, -0.7071067811865476, 0)), keep=Keep.TOP, mode=Mode.PRIVATE)
    add(chamfer2_piece_3, mode=Mode.SUBTRACT)
    with BuildSketch(Plane(origin=(90, 124, -13.777873515), x_dir=(-0.9957666790179708, 0.09191692421704371, 0), z_dir=(0, 0, 1))) as chamfer2_piece_4:
        Polygon((CHAMFER2_SIZE_2, 0), (-CHAMFER2_SIZE * 0.091916924217, CHAMFER2_SIZE * 0.995766679018), (0, 0), align=None)
    extrude(amount=22.55574703, mode=Mode.SUBTRACT)
    with BuildSketch(Plane(origin=(-10, 120, 8.838228863), x_dir=(0.994665757729657, 0.10315052302381846, 0), z_dir=(0, 0, -1))) as chamfer2_piece_5:
        Polygon((CHAMFER2_SIZE, 0), (-CHAMFER2_SIZE_3 * 0.103150523018, CHAMFER2_SIZE_3 * 0.994665757675), (0, 0), align=None)
    extrude(amount=22.676457725, mode=Mode.SUBTRACT)
    # the kernel refuses this chamfer: 1.682528735, 1.659567856, 1.622677659, 1.5 mm, written as the material it takes off along each edge
    with BuildSketch(Plane(origin=(-10, 121.281669578, 3.225167159), x_dir=(1.0947071525708958e-15, -0.7052132765564088, -0.7089952288757478), z_dir=(0, -0.708995228875748, 0.7052132765564088))) as chamfer2_2_piece_1:
        Polygon((CHAMFER2_SIZE_4, 0), (-CHAMFER2_SIZE * 0.0729384343131, CHAMFER2_SIZE * 0.997336445138), (0, 0), align=None)
    extrude(amount=13.078624167, mode=Mode.SUBTRACT)
    with BuildSketch(Plane(origin=(-10, 114.019713141, -15.44838656), x_dir=(0, -0.7052132765564026, 0.708995228875754), z_dir=(0, 0.708995228875754, 0.7052132765564026))) as chamfer2_2_piece_2:
        Polygon((CHAMFER2_SIZE_4, 0), (-CHAMFER2_SIZE * 0.0729384343132, CHAMFER2_SIZE * 0.997336445138), (0, 0), align=None)
    extrude(amount=10.242602688, mode=Mode.SUBTRACT)
    # the kernel refuses this chamfer: 1.682528735, 1.659567856, 1.622677659, 1.5 mm, written as the material it takes off along each edge
    with BuildSketch(Plane(origin=(-10, 118.540461588, -12.5), x_dir=(1, 0, 0), z_dir=(0, -1, 0))) as chamfer2_3_piece_1_section:
        Polygon((CHAMFER2_SIZE, 0), (0, CHAMFER2_SIZE), (0, 0), align=None)
    chamfer2_3_piece_1 = extrude(amount=113.163899491, mode=Mode.PRIVATE)
    chamfer2_3_piece_1 = chamfer2_3_piece_1 - Plane(origin=(14.987616754, 16.162364314, -12.5), x_dir=(-0.9995046701515636, 0.03147084913398626, 0), z_dir=(0, 0, 1)) * Cylinder(25, 233, mode=Mode.PRIVATE)
    add(chamfer2_3_piece_1, mode=Mode.SUBTRACT)

    # Chamfer3
    chamfer3_edges = [part.edges().sort_by_distance(p)[0] for p in [
        (42.957326062, 0, 12.5),
    ]]
    chamfer3_side = [part.faces().sort_by_distance(p)[0] for p in [
        (42.049090342, 56.739831495, 12.5),
    ]]
    chamfer(chamfer3_edges, length=CHAMFER3_SIZE, length2=CHAMFER3_SIZE2, reference=chamfer3_side[0])

    # Chamfer4
    # the kernel refuses this chamfer: 1.5, 1.228684906, 0.866025404, 0.762190103, 0.750246653 mm, written as the material it takes off along each edge
    with BuildSketch(Plane(origin=(92.159597133, 41.206147584, -1.358522588), x_dir=(0.03815670230197311, -0.9992717678737044, 0), z_dir=(0, 0, 1))) as chamfer4_piece_1_section:
        with BuildLine():
            Line((1.491254466, 0), (-CHAMFER4_SIZE * 0.377626644879, -CHAMFER4_SIZE * 0.925957945696))
            Line((-CHAMFER4_SIZE * 0.377626644879, -CHAMFER4_SIZE * 0.925957945696), (0, 0))
            ThreePointArc((0, 0), (0.771555378, 0.001262021), (1.491254466, 0))
        make_face()
    chamfer4_piece_1 = extrude(amount=17.717045177, mode=Mode.PRIVATE)
    chamfer4_piece_1 = split(chamfer4_piece_1, bisect_by=Plane(origin=(93.972509735, 40.54630136, 0.570738706), z_dir=(0.6644630243886752, -0.24184476264797503, 0.7071067811865474)), keep=Keep.TOP, mode=Mode.PRIVATE)
    add(chamfer4_piece_1, mode=Mode.SUBTRACT)
    with BuildSketch(Plane(origin=(95.806195223, 39.878894423, 12.5), x_dir=(0, 0, -1), z_dir=(-0.9396926207859086, 0.3420201433256681, 0))) as chamfer4_piece_2_section:
        Polygon((CHAMFER4_SIZE_2, 0), (0, CHAMFER4_SIZE_3), (0, 0), align=None)
    chamfer4_piece_2 = extrude(amount=17.761257264, mode=Mode.PRIVATE)
    chamfer4_piece_2 = split(chamfer4_piece_2, bisect_by=Plane(origin=(89.284433074, 42.25262172, 5.559685684), z_dir=(0.6644630243886752, -0.24184476264797503, 0.7071067811865474)), keep=Keep.TOP, mode=Mode.PRIVATE)
    add(chamfer4_piece_2, mode=Mode.SUBTRACT)
    with BuildSketch(Plane(origin=(99.437852653, 59.840634667, 12.5), x_dir=(0, 0, -1), z_dir=(-0.9396926207859086, 0.3420201433256681, 0))) as chamfer4_piece_3_section:
        Polygon((CHAMFER4_SIZE_3, 0), (0, -CHAMFER4_SIZE_2), (0, 0), align=None)
    chamfer4_piece_3 = extrude(amount=14.346581693, mode=Mode.PRIVATE)
    chamfer4_piece_3 = split(chamfer4_piece_3, bisect_by=Plane(origin=(94.520463222, 61.63041805, 7.26702347), z_dir=(0.6644630243886752, -0.24184476264797503, 0.7071067811865474)), keep=Keep.TOP, mode=Mode.PRIVATE)
    add(chamfer4_piece_3, mode=Mode.SUBTRACT)
    with BuildSketch(Plane(origin=(99, 60, 13.380628632), x_dir=(-0.9396926207859109, 0.3420201433256619, 0), z_dir=(0, 0, -1))) as chamfer4_piece_4_section:
        Polygon((CHAMFER4_SIZE_2, 0), (CHAMFER4_SIZE_4 * 0.477630582411, CHAMFER4_SIZE_4 * 0.878560770762), (0, 0), align=None)
    chamfer4_piece_4 = extrude(amount=14.761257264, mode=Mode.PRIVATE)
    chamfer4_piece_4 = split(chamfer4_piece_4, bisect_by=Plane(origin=(93.887776783, 61.860697082, 7.940314316), z_dir=(0.6644630243886752, -0.24184476264797503, 0.7071067811865474)), keep=Keep.TOP, mode=Mode.PRIVATE)
    add(chamfer4_piece_4, mode=Mode.SUBTRACT)
    with BuildSketch(Plane(origin=(93.051749599, 62.164986092, 15.06128604), x_dir=(-0.6202143570232375, 0.22573956482105997, -0.7512494926565012), z_dir=(0.7059436046184719, -0.25694245915171204, -0.6600183329145861))) as chamfer4_piece_5:
        Polygon((CHAMFER4_SIZE_5, 0), (CHAMFER4_SIZE_2 * 0.337735823527, CHAMFER4_SIZE_2 * 0.941240943386), (0, 0), align=None)
    extrude(amount=12.306585553, mode=Mode.SUBTRACT)


solid = part.part
